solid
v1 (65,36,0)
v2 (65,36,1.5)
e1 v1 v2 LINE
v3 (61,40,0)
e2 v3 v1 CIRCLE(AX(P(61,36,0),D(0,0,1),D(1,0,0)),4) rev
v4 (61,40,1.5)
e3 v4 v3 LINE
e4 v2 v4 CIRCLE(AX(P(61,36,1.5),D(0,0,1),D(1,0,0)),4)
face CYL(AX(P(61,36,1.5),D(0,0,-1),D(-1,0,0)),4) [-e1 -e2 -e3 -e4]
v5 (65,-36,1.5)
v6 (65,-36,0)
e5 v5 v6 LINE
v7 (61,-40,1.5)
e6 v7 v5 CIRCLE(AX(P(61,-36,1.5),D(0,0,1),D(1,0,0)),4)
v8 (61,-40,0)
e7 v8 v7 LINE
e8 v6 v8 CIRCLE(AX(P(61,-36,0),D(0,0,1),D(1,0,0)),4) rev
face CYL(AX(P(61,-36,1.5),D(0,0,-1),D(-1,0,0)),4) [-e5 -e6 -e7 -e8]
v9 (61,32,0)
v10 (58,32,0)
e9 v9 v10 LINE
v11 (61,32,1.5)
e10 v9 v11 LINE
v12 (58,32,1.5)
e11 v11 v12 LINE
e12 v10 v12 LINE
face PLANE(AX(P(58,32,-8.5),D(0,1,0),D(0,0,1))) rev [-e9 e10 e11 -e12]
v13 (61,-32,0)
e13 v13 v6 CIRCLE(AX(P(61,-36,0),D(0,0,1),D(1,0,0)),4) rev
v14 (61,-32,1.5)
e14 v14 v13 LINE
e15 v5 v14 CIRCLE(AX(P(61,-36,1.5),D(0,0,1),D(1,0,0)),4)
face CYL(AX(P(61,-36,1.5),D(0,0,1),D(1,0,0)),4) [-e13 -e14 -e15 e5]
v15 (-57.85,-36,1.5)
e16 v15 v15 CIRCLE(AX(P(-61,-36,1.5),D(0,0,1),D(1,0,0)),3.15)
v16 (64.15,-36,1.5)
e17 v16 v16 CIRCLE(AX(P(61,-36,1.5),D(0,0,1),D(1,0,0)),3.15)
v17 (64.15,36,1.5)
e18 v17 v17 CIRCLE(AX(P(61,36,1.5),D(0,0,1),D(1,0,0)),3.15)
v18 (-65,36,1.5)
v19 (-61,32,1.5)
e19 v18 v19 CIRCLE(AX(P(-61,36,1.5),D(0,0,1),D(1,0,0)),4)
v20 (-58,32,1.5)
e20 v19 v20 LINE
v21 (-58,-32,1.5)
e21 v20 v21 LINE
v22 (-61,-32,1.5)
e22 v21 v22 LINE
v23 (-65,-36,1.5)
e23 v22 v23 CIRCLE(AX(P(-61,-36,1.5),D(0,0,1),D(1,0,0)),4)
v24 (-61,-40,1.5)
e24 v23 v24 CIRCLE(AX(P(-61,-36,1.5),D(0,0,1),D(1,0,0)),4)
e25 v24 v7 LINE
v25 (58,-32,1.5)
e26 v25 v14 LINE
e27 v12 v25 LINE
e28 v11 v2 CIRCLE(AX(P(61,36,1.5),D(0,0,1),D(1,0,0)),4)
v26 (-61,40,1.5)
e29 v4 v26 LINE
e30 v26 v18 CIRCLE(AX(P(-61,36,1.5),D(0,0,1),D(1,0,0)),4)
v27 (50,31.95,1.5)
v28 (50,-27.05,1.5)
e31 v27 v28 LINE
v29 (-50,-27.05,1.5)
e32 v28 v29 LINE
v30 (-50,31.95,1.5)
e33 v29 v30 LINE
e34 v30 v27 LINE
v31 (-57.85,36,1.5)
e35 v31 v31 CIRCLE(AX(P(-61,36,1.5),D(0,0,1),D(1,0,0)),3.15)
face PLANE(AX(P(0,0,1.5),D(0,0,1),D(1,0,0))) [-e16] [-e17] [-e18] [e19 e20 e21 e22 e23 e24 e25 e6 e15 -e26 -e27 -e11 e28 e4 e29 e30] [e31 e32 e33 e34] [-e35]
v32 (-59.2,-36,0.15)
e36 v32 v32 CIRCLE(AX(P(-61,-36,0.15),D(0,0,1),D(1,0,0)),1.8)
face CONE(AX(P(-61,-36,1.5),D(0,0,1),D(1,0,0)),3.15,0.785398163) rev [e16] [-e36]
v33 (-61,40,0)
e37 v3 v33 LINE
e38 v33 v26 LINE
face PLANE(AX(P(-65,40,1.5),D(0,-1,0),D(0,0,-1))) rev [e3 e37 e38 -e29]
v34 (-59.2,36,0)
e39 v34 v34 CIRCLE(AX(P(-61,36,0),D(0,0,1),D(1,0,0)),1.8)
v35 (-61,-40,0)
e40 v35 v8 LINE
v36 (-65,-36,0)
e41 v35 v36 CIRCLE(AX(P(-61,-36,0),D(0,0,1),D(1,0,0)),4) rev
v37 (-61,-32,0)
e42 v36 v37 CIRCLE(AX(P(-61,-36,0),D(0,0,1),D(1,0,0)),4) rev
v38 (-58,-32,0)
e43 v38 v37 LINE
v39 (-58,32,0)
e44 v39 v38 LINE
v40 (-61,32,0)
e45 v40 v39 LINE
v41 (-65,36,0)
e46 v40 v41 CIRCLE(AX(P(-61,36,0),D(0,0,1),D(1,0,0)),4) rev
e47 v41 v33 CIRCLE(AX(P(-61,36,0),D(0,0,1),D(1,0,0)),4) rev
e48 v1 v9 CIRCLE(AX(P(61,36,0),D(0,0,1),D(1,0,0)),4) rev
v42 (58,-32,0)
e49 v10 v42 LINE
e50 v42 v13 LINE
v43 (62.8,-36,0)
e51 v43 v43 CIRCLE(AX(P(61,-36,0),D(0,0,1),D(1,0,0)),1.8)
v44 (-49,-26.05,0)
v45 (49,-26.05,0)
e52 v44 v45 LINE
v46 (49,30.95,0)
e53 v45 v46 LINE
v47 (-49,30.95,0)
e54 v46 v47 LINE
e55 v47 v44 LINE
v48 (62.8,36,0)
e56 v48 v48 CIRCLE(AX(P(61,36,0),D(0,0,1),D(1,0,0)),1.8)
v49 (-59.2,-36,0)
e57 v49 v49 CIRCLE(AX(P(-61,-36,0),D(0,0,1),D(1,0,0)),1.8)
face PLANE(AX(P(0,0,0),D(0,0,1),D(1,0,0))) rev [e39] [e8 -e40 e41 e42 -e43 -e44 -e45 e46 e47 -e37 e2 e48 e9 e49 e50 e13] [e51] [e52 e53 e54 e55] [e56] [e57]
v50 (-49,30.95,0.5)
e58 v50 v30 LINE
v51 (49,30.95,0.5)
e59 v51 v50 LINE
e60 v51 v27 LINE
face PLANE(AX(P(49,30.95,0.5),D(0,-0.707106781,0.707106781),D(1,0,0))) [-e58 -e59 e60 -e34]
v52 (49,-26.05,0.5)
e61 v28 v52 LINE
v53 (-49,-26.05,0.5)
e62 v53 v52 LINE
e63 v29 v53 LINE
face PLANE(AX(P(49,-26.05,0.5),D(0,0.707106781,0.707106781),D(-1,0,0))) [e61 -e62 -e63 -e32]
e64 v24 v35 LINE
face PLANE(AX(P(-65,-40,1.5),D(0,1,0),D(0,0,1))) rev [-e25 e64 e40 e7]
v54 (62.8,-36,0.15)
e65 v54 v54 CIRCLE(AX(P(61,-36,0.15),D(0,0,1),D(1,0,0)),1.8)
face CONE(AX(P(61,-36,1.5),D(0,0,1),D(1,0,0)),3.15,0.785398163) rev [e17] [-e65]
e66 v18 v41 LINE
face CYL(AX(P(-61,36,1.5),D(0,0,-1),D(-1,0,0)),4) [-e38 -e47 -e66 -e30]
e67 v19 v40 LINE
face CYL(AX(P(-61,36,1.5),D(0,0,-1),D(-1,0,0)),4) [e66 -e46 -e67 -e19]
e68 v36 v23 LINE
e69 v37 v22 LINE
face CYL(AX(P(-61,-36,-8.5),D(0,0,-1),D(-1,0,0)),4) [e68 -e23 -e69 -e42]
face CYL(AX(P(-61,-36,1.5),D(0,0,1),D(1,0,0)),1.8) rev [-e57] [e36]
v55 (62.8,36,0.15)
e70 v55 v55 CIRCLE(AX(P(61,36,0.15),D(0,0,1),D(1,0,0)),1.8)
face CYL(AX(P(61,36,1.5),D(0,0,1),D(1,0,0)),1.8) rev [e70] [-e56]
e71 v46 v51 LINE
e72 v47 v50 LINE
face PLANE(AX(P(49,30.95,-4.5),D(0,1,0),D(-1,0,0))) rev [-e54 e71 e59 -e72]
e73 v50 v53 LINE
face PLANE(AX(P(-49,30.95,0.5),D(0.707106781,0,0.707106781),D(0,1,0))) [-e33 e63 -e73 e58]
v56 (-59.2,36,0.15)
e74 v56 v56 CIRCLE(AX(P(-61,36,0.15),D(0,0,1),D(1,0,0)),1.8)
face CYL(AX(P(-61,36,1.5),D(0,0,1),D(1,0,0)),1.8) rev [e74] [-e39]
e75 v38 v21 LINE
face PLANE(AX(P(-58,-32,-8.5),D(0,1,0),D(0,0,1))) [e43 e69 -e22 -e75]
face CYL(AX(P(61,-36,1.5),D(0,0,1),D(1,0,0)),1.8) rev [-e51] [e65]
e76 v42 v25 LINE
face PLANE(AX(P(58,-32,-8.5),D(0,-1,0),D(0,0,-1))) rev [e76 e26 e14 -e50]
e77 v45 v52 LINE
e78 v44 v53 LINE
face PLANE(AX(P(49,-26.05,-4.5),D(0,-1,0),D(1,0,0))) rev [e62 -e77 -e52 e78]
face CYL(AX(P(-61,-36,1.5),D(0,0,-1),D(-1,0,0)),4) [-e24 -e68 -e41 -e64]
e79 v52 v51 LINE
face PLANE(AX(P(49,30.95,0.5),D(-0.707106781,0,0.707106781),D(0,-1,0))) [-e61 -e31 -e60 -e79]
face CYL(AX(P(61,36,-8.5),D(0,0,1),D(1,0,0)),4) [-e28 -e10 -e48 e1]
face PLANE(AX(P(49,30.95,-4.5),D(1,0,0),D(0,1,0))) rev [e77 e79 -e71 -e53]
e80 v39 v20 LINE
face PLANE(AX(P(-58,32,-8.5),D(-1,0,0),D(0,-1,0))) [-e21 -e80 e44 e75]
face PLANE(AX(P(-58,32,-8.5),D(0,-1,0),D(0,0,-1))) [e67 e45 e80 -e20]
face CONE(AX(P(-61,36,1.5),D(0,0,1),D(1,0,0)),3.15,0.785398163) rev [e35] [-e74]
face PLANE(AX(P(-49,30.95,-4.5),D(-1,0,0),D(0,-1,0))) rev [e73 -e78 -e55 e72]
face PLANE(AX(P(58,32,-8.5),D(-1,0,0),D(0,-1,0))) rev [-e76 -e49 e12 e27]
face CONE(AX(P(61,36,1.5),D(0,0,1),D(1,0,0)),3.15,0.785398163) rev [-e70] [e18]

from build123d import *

# Parameters (mm, degrees)
SKETCH1_W           = 130
SKETCH1_H           = 80
BOSS_EXTRUDE1_DEPTH = 1.5
FILLET1_R           = 4
SKETCH4_W           = 98
SKETCH4_H           = 57
CUT_EXTRUDE1_DEPTH  = 6
SKETCH6_W           = 7
SKETCH6_H           = 64
CUT_EXTRUDE3_DEPTH  = 10
FILLET3_R           = 4
CHAMFER1_SIZE       = 1


with BuildPart() as part:
    # Sketch1 → Boss-Extrude1 (new body)
    with BuildSketch(Plane.XY):
        Rectangle(SKETCH1_W, SKETCH1_H)
    extrude(amount=BOSS_EXTRUDE1_DEPTH)

    # Fillet1
    fillet1_edges = [part.edges().sort_by_distance(p)[0] for p in [
        (65, -40, 0.75),
        (-65, -40, 0.75),
        (-65, 40, 0.75),
        (65, 40, 0.75),
    ]]
    fillet(fillet1_edges, radius=FILLET1_R)

    # Sketch3 → CSK for M3 Flat Countersunk Head Screw1 (revolve, cut)
    with BuildSketch(Plane(origin=(-61, 36, 1.5), x_dir=(0, -1, 0), z_dir=(1, 0, 0))):
        Polygon((0, 0), (0, 1.5), (1.8, 1.5), (1.8, 1.35), (3.15, 0), align=None)
    csk_for_m3_flat_countersunk_head_screw1 = revolve(axis=Axis((-61, 36, 7.85), (0, 0, -1)), mode=Mode.SUBTRACT)

    # Mirror1: CSK for M3 Flat Countersunk Head Screw1 across plane
    add(csk_for_m3_flat_countersunk_head_screw1.mirror(Plane(origin=(0, 0, 0), x_dir=(0, 0, 1), z_dir=(1, 0, 0))), mode=Mode.SUBTRACT)

    # Mirror2: CSK for M3 Flat Countersunk Head Screw1 across plane
    add(csk_for_m3_flat_countersunk_head_screw1.mirror(Plane.ZX), mode=Mode.SUBTRACT)

    # Mirror2 copy 1 sketch → Mirror2 copy 1 (revolve, cut)
    with BuildSketch(Plane(origin=(61, -36, 1.5), x_dir=(0, 1, 0), z_dir=(-1, 0, 0))):
        Polygon((0, 0), (0, 1.5), (1.8, 1.5), (1.8, 1.35), (3.15, 0), align=None)
    revolve(axis=Axis((61, -36, 7.85), (0, 0, -1)), mode=Mode.SUBTRACT)

    # Sketch4 → Cut-Extrude1 (cut)
    with BuildSketch(Plane.XY.offset(1.5)):
        with Locations((0, 2.45)):
            Rectangle(SKETCH4_W, SKETCH4_H)
    extrude(amount=-CUT_EXTRUDE1_DEPTH, mode=Mode.SUBTRACT)

    # Sketch6 → Cut-Extrude3 (cut)
    with BuildSketch(Plane.XY.offset(1.5)):
        with Locations((61.5, 0)):
            Rectangle(SKETCH6_W, SKETCH6_H)
    cut_extrude3 = extrude(amount=-CUT_EXTRUDE3_DEPTH, mode=Mode.SUBTRACT)

    # Mirror6: Cut-Extrude3 across plane
    add(cut_extrude3.mirror(Plane(origin=(0, 0, 0), x_dir=(0, 0, 1), z_dir=(1, 0, 0))), mode=Mode.SUBTRACT)

    # Fillet3
    fillet3_edges = [part.edges().sort_by_distance(p)[0] for p in [
        (65, -32, 0.75),
        (65, 32, 0.75),
        (-65, -32, 0.75),
        (-65, 32, 0.75),
    ]]
    fillet(fillet3_edges, radius=FILLET3_R - 0.0001)  # a hair under: the kernel refuses the full size

    # Chamfer1
    chamfer1_edges = [part.edges().sort_by_distance(p)[0] for p in [
        (-49, 2.45, 1.5),
        (0, -26.05, 1.5),
        (49, 2.45, 1.5),
        (0, 30.95, 1.5),
    ]]
    chamfer(chamfer1_edges, length=CHAMFER1_SIZE)


solid = part.part
